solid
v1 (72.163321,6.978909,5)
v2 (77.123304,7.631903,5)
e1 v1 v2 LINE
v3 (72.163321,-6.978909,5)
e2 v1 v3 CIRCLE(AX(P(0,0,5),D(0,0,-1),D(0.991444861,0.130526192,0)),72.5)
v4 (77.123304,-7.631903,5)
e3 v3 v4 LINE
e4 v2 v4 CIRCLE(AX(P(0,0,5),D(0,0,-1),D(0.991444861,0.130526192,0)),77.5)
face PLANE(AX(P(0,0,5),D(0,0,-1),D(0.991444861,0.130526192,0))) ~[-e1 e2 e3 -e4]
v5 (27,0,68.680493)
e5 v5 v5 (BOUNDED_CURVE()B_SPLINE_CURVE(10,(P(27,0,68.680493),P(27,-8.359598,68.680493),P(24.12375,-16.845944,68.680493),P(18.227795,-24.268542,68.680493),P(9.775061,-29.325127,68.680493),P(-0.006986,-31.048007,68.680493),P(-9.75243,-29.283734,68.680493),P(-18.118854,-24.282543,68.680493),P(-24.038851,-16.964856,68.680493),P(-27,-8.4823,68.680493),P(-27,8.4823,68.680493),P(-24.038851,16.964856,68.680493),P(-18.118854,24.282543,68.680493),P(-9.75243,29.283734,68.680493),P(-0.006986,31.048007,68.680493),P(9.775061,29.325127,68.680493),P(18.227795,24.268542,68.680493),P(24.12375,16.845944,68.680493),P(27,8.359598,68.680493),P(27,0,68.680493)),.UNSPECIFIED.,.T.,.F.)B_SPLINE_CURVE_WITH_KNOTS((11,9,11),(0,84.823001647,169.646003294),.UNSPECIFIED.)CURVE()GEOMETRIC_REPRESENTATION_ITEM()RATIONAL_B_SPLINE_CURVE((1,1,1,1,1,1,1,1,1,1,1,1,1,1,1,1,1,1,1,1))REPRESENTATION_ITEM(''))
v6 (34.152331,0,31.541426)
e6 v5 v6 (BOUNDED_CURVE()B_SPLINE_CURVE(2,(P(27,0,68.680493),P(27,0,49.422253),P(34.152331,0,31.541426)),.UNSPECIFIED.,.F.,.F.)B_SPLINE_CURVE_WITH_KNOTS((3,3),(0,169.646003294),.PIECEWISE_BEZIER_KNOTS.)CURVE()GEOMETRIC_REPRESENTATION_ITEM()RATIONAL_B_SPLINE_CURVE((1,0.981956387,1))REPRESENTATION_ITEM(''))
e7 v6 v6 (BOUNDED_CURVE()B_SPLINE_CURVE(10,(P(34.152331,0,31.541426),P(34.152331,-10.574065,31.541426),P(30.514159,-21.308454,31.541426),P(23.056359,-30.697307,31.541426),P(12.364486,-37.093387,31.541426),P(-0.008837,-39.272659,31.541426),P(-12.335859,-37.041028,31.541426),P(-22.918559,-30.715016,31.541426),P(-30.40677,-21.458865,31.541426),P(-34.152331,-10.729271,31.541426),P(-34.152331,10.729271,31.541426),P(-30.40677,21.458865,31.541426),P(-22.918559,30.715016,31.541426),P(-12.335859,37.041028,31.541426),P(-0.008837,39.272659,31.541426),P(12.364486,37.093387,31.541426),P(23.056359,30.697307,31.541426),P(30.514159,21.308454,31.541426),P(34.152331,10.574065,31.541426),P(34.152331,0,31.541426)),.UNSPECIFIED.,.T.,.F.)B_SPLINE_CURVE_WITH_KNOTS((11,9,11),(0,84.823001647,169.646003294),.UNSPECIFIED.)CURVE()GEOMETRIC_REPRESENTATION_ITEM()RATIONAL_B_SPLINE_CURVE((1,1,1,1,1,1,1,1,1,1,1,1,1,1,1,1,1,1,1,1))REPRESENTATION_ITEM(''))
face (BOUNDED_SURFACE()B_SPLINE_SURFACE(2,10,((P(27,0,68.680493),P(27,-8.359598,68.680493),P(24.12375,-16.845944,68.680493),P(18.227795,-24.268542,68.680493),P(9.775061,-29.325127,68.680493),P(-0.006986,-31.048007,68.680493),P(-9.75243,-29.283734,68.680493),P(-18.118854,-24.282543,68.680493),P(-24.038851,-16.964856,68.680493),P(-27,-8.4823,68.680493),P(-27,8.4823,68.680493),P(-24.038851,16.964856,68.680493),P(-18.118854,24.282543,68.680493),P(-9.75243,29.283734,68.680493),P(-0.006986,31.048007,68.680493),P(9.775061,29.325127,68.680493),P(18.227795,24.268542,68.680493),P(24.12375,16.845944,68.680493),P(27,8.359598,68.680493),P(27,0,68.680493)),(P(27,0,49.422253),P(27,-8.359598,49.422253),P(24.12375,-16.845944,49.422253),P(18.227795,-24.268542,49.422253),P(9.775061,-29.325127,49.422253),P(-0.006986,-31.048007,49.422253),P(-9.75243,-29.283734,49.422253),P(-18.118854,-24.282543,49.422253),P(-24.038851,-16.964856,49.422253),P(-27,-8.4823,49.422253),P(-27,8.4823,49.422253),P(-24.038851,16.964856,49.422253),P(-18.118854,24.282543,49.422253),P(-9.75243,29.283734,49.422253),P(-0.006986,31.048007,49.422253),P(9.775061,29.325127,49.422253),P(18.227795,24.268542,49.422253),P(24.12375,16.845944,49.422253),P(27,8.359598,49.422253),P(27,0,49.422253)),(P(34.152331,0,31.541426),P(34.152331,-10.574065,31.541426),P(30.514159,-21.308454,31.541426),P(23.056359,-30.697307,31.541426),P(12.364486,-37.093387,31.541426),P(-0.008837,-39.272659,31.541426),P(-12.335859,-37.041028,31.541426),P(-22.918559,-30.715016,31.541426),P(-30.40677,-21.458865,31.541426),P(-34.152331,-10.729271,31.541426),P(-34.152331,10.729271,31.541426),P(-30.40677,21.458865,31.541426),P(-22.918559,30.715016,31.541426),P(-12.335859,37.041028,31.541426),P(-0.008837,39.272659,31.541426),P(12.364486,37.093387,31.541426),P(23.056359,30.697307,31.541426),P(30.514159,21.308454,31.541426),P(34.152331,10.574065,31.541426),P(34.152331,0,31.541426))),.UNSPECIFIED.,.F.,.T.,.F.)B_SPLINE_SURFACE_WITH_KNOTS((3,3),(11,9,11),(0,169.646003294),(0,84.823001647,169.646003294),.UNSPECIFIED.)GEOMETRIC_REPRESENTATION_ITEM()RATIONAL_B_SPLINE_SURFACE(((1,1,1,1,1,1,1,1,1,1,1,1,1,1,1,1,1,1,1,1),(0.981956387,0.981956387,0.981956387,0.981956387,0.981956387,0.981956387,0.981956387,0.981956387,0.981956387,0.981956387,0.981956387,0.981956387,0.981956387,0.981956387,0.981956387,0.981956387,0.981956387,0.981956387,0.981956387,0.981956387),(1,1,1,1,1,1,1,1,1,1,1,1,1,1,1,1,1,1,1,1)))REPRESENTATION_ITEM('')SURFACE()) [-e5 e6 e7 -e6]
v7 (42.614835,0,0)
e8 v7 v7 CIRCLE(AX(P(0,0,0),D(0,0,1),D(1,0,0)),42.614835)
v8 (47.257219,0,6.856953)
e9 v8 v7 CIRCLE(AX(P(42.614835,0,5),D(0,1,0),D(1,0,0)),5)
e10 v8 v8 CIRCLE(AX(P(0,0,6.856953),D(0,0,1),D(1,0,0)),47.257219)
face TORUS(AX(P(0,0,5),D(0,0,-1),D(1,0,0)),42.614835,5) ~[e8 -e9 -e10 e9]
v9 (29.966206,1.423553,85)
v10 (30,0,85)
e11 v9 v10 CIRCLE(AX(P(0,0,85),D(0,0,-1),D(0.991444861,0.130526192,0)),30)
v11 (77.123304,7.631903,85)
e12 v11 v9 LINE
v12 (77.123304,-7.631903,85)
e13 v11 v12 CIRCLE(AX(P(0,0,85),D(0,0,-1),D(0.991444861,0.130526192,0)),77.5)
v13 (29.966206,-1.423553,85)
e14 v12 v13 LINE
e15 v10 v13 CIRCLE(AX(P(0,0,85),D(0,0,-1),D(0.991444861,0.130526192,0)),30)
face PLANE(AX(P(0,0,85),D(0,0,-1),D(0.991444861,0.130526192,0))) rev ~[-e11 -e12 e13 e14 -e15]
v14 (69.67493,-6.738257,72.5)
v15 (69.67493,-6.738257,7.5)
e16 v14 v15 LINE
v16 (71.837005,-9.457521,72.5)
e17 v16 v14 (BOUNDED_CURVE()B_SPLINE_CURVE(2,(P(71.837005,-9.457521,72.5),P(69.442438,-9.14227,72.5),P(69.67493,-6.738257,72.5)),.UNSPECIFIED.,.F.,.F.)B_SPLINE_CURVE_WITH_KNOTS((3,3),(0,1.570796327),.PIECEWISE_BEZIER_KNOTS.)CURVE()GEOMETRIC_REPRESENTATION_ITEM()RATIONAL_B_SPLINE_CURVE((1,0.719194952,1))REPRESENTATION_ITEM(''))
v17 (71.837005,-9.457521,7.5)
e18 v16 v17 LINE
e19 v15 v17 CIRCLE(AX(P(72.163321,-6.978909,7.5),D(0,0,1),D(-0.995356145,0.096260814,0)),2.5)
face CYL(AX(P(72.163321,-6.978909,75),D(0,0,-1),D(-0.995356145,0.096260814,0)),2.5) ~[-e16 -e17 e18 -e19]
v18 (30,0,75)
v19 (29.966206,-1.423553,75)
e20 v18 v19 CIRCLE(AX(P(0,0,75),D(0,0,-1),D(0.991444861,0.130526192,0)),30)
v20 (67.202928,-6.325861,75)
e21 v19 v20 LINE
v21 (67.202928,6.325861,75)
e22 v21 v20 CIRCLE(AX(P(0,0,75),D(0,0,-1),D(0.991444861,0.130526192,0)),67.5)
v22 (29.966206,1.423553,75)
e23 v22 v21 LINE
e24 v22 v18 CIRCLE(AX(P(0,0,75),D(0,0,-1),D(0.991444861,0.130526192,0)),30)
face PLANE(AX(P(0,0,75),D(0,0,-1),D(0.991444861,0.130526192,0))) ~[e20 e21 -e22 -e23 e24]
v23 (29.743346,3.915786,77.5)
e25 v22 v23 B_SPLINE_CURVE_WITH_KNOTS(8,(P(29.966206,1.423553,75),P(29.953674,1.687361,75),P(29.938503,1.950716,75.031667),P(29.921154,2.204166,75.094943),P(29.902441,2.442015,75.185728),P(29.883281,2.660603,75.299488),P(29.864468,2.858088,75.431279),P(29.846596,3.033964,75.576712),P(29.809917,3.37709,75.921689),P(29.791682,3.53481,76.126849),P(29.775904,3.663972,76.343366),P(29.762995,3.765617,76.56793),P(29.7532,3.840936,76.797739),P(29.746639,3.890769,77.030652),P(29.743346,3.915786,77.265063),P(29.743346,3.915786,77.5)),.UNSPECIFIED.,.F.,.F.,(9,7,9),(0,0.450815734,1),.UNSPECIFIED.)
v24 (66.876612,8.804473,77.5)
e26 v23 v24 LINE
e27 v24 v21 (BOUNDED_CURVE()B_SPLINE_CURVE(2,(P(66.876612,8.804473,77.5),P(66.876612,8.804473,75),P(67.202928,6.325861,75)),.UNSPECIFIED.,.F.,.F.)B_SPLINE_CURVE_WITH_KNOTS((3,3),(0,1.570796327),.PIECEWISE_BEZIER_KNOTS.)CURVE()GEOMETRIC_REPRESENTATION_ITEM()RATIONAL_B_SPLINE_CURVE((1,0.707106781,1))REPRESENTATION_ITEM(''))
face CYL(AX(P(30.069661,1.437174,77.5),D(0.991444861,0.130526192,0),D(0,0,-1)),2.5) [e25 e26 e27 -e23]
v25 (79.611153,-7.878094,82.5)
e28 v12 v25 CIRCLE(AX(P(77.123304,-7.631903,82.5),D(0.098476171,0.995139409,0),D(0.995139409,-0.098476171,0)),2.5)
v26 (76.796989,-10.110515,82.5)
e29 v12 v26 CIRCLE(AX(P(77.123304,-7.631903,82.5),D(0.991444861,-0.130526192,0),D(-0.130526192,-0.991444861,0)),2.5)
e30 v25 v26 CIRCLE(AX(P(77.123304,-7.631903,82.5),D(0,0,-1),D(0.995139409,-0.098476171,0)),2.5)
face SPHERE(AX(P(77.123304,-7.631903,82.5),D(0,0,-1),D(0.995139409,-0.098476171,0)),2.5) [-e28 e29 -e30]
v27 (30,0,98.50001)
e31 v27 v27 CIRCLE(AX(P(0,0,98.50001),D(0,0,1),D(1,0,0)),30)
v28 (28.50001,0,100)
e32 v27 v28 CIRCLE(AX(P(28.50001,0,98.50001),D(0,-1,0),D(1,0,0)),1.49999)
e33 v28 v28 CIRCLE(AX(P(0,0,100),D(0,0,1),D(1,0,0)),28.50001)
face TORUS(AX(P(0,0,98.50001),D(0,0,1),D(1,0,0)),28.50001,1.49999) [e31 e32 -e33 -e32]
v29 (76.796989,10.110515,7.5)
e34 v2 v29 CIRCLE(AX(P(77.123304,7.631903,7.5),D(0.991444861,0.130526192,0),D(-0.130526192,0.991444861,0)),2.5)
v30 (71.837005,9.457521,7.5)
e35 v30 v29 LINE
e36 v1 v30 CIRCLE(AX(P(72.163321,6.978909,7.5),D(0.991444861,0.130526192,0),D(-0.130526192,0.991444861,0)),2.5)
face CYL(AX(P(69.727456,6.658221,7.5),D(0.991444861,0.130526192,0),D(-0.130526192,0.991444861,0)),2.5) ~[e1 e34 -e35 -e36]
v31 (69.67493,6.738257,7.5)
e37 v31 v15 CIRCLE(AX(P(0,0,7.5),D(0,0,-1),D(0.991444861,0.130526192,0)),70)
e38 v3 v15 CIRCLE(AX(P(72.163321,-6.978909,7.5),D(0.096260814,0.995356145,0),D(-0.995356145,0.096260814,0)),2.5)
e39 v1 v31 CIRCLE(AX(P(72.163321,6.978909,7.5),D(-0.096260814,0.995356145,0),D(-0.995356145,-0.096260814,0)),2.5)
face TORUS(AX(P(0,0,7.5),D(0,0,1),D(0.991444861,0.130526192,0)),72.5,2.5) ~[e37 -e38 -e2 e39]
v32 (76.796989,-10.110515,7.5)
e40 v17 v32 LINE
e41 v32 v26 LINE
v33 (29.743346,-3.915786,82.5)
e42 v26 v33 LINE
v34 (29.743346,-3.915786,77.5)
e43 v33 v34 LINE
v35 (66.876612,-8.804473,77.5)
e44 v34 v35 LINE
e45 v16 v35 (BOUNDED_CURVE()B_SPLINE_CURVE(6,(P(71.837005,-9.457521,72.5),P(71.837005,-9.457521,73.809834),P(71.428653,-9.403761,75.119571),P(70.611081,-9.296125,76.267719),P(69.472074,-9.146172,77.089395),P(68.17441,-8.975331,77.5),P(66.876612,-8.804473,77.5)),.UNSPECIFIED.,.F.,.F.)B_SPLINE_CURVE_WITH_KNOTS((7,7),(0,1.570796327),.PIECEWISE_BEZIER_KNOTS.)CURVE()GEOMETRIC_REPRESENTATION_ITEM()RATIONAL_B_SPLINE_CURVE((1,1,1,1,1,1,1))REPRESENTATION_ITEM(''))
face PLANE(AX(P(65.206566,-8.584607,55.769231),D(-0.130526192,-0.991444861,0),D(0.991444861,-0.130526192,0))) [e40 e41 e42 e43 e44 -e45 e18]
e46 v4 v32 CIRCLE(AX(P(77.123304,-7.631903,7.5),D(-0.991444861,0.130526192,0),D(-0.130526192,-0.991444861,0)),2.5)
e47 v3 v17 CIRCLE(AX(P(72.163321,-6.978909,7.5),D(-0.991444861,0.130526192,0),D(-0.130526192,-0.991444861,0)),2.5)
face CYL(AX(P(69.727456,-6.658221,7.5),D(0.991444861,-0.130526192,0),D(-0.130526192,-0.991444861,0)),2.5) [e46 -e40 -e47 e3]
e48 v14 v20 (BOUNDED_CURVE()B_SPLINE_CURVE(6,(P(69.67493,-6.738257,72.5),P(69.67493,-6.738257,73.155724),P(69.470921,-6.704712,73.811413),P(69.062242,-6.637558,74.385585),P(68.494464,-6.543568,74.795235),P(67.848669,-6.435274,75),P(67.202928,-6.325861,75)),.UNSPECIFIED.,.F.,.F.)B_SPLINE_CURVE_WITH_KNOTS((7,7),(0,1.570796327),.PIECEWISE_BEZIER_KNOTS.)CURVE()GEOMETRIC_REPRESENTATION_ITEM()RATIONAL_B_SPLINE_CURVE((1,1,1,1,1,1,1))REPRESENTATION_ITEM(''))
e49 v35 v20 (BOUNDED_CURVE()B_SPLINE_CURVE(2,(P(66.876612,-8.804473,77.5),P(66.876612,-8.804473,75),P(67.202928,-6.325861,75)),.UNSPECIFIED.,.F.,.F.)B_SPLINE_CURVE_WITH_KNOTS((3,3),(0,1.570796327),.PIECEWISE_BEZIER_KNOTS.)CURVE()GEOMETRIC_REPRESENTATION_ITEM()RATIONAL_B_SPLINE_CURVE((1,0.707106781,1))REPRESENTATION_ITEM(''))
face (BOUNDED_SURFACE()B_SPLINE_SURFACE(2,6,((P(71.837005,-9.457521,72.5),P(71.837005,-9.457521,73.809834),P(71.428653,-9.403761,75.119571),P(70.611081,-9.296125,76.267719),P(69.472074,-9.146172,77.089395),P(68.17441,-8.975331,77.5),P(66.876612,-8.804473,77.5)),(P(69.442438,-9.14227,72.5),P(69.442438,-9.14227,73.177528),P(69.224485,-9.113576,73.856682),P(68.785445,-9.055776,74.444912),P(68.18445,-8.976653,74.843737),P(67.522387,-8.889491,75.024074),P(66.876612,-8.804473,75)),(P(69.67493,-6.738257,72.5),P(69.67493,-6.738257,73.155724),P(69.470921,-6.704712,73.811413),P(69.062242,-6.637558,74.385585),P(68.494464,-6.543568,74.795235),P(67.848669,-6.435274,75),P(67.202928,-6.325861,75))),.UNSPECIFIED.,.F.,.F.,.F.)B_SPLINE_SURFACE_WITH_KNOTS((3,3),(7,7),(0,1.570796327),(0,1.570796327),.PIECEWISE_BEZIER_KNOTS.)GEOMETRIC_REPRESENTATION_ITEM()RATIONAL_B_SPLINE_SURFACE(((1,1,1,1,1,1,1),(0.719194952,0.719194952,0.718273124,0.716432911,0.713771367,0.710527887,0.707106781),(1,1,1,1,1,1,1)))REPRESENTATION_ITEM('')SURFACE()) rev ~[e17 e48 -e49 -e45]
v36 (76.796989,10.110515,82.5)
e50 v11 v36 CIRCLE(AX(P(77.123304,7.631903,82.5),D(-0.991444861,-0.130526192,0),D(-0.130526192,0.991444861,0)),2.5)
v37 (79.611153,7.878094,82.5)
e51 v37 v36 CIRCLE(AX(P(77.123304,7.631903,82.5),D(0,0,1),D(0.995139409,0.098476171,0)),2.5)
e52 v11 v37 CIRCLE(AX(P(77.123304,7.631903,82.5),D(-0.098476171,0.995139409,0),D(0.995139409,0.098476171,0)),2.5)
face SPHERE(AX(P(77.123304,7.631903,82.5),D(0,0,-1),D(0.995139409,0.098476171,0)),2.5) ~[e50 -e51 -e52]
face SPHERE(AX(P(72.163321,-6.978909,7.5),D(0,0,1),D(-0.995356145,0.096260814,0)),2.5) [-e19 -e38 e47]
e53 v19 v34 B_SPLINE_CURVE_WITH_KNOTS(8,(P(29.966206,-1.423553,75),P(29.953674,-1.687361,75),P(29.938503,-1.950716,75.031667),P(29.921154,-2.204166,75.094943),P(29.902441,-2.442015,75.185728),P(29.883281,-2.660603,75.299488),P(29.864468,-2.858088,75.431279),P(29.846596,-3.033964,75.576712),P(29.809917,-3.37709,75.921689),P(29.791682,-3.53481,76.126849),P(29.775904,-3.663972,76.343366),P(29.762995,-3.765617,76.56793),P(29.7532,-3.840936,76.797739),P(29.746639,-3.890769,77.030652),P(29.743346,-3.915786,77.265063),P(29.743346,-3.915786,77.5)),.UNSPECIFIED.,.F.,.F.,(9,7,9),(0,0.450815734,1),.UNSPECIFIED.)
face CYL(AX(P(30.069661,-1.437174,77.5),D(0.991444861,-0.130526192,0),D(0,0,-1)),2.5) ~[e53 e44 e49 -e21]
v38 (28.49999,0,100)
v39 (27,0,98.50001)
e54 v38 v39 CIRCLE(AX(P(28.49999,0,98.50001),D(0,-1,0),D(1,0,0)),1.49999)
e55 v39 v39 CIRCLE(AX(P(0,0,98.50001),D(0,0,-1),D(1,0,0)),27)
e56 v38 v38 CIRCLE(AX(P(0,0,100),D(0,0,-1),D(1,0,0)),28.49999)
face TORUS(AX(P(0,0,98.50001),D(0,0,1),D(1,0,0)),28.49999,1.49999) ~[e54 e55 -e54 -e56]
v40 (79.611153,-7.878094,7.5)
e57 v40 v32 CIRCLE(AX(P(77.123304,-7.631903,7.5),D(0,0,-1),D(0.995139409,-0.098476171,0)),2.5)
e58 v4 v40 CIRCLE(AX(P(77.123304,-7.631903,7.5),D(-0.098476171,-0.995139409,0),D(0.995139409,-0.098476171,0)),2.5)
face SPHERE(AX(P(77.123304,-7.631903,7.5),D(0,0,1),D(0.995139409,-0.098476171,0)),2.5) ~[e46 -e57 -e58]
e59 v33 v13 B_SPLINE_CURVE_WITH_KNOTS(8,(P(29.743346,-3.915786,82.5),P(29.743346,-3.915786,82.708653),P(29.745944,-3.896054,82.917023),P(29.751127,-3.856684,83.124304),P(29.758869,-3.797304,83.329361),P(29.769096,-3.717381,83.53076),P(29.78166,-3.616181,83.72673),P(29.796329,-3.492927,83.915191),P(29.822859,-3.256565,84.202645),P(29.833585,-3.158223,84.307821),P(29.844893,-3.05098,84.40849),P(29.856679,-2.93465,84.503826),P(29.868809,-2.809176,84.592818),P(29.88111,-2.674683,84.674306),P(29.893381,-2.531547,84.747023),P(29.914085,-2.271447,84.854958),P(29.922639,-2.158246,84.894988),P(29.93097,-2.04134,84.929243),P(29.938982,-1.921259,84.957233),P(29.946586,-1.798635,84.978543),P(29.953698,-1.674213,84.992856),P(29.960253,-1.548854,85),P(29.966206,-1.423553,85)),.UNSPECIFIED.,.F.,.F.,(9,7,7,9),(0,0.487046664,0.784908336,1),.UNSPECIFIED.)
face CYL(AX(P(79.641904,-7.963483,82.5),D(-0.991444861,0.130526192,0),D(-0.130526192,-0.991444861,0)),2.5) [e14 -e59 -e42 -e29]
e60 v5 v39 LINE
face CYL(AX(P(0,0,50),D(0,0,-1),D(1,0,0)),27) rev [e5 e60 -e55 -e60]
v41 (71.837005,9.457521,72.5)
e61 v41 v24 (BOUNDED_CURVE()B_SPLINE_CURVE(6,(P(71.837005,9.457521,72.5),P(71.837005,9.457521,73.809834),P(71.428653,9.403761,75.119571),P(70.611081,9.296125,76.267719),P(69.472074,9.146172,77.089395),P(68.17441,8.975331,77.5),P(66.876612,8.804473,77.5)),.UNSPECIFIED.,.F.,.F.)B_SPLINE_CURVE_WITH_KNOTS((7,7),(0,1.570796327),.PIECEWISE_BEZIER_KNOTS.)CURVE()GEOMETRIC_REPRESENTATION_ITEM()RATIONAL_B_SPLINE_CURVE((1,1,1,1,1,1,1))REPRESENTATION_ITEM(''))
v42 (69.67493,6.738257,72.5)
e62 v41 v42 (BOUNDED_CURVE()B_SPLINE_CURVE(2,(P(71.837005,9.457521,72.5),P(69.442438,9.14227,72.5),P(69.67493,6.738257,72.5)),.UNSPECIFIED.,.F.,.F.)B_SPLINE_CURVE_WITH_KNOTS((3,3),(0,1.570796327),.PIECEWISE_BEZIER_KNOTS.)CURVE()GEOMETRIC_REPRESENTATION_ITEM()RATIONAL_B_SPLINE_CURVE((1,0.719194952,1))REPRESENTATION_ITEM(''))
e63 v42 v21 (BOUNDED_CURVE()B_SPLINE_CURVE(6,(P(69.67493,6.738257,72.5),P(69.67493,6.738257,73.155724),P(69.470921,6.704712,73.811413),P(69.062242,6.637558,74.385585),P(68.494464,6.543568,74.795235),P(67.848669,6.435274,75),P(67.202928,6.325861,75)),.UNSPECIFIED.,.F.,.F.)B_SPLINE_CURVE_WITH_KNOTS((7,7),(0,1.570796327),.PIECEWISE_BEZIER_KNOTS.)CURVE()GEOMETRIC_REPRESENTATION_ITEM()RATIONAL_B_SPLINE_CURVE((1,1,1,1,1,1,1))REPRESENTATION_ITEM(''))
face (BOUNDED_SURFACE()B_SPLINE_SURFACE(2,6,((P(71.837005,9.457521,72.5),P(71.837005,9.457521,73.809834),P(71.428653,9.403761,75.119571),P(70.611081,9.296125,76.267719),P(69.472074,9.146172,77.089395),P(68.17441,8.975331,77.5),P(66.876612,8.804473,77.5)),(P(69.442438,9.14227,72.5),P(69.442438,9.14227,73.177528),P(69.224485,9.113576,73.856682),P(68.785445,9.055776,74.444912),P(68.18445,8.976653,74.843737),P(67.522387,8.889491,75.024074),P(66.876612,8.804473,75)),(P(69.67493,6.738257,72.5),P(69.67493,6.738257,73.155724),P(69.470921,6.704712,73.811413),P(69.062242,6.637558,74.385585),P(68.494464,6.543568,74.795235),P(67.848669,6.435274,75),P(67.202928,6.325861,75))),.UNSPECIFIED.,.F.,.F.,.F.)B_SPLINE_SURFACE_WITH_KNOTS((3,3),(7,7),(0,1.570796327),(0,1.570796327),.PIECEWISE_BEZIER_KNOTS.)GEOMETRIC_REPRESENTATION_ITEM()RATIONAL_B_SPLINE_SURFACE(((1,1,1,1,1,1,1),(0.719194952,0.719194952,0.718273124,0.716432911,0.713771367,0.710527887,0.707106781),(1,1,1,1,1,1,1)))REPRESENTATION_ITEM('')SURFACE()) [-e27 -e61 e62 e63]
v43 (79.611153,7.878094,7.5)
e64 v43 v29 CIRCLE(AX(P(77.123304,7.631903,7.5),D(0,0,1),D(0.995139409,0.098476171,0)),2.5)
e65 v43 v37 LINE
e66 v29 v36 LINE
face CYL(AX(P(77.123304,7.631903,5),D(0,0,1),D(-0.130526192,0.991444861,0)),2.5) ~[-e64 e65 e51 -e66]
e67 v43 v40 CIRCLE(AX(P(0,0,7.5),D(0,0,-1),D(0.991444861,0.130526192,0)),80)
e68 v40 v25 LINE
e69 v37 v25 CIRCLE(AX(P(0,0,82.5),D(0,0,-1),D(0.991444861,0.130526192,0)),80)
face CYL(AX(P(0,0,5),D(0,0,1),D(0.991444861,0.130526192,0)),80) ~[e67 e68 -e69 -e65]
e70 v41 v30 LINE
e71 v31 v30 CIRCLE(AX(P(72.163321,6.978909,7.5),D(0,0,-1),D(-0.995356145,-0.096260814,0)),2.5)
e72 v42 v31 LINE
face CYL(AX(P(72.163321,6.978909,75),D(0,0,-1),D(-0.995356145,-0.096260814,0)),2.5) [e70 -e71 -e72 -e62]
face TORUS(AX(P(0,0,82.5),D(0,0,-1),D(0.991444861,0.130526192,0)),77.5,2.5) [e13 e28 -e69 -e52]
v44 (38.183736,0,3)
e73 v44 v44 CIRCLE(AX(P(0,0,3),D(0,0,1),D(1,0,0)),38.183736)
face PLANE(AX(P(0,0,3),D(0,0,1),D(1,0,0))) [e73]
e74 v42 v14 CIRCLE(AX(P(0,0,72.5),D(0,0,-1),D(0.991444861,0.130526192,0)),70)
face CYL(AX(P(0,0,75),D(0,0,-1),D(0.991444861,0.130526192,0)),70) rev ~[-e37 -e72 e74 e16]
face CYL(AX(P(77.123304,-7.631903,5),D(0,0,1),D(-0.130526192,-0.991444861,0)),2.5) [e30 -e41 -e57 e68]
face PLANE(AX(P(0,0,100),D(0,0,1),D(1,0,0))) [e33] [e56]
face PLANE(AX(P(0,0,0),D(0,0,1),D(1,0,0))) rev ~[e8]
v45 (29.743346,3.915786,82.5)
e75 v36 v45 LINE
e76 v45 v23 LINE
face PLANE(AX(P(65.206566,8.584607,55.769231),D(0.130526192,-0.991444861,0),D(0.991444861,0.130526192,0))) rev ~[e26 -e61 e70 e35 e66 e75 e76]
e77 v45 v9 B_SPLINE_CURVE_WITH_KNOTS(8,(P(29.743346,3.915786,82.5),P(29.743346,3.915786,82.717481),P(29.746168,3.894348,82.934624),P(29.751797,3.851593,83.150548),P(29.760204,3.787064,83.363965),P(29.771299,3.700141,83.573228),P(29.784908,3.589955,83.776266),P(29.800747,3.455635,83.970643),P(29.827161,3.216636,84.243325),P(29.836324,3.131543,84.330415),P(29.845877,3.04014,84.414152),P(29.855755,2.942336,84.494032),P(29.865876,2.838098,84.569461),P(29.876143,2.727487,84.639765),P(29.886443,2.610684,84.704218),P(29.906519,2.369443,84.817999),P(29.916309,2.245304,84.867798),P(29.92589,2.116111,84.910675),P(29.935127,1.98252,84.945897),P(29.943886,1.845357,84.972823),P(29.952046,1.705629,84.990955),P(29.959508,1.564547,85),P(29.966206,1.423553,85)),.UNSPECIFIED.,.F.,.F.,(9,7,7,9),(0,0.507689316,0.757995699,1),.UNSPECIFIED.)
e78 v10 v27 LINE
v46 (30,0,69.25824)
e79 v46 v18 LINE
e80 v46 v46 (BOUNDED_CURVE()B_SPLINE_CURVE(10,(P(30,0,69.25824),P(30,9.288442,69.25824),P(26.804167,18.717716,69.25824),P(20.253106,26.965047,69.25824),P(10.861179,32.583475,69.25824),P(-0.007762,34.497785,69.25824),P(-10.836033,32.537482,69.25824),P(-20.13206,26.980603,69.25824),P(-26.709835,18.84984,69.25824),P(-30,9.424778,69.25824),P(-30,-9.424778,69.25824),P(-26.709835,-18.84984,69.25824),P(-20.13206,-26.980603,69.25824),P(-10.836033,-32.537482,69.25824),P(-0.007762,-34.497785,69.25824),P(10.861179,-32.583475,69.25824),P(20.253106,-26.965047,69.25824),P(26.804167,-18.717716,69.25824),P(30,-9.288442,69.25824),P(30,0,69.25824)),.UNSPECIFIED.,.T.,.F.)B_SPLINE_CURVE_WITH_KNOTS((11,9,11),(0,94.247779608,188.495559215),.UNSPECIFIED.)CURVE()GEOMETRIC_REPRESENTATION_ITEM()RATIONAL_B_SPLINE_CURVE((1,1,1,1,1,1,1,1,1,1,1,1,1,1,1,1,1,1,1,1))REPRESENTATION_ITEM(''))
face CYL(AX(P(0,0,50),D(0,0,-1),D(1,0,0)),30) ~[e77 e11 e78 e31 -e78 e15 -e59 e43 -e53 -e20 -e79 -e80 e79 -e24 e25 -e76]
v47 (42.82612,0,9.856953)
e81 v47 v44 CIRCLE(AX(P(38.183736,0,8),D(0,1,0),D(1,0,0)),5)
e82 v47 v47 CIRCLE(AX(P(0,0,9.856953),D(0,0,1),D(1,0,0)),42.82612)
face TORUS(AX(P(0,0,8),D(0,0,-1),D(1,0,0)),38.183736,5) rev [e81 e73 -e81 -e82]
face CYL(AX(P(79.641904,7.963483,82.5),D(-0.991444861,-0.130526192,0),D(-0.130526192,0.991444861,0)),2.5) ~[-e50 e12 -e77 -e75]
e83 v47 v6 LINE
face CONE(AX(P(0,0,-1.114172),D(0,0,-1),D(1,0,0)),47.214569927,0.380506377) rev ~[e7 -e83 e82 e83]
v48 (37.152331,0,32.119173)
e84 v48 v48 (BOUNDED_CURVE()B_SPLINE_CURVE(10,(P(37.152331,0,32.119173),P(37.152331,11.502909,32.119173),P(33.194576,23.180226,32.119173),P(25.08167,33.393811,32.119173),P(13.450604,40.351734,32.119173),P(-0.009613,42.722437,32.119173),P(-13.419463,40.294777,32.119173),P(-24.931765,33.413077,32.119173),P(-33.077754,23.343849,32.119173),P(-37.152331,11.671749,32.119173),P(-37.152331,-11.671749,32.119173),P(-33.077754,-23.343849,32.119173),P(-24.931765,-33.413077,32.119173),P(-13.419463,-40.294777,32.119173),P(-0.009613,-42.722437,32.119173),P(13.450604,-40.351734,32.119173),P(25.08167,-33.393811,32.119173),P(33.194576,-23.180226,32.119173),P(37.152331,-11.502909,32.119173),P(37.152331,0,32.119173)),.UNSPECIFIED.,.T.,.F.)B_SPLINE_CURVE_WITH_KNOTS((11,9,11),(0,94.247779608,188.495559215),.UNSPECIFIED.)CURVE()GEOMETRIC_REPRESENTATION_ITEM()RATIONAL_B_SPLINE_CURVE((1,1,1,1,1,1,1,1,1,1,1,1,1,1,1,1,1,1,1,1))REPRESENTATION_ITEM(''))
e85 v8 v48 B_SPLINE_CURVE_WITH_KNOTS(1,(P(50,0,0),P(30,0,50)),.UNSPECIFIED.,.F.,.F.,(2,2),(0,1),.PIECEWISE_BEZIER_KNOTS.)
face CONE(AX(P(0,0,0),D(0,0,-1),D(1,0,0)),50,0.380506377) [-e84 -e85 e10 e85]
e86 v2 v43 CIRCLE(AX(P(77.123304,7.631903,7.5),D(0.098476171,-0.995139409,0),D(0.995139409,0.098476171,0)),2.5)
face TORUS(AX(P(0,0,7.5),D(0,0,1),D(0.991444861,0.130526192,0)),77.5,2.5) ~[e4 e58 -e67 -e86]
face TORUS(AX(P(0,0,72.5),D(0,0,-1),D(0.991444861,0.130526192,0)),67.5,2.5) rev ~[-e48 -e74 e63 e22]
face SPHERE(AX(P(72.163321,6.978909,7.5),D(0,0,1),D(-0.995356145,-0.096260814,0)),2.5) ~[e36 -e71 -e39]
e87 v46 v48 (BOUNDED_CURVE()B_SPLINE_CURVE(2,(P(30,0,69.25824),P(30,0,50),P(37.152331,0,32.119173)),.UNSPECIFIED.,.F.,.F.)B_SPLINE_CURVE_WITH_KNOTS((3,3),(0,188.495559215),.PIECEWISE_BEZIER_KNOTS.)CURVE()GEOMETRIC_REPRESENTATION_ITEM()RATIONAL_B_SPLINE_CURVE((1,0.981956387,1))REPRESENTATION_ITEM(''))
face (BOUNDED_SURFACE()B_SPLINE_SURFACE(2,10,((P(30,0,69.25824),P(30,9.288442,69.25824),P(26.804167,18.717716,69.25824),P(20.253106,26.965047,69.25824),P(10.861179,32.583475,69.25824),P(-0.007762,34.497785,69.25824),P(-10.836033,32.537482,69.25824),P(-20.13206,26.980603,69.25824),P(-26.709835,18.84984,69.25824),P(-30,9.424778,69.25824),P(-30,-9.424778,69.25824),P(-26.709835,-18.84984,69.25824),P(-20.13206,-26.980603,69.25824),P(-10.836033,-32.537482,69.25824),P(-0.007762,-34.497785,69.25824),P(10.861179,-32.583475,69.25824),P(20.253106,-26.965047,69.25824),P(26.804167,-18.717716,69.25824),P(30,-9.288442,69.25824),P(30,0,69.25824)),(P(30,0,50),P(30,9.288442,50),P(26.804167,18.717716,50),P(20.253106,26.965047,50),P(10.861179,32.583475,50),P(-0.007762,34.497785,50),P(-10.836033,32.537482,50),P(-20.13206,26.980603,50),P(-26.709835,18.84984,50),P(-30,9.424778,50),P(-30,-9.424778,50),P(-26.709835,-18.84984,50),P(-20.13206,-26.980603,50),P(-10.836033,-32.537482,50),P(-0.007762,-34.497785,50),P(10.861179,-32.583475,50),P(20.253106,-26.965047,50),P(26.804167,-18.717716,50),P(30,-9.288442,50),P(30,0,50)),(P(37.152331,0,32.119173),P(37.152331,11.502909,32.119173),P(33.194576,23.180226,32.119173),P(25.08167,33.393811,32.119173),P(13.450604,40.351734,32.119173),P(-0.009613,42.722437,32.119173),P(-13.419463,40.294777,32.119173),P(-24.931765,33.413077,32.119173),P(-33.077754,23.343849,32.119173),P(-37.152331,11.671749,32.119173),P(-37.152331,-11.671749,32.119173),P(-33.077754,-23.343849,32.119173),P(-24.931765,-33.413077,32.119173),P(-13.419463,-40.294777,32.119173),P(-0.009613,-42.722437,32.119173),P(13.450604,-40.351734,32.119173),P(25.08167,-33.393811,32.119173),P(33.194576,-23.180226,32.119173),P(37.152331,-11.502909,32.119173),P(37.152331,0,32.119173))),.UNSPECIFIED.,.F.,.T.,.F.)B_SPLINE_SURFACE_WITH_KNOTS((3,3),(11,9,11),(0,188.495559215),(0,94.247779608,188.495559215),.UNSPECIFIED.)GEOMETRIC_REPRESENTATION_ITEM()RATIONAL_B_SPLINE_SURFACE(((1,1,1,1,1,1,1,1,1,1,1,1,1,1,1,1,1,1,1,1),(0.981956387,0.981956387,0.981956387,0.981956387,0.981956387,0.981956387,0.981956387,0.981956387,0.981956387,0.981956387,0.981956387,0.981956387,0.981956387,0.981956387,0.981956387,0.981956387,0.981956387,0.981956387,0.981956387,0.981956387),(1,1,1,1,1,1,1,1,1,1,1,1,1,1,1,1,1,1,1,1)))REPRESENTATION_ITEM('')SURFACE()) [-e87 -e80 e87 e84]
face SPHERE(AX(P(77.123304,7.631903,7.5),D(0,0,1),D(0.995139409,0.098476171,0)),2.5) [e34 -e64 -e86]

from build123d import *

# Parameters (mm, degrees)
F0_R          = 50
F2_R          = 30
F4_DEPTH      = 50
F5_T          = -3
F6_R          = 1.49999
F7_R          = 5
F9_ANGLE_BACK = 7.5
F9_ANGLE      = 15
F10_R         = 2.5
F11_R         = 100


# Not quite as in the source:
# - a fillet or chamfer is up to 0.001 mm smaller than in the source, because OpenCascade refuses the exact size


with BuildPart() as f3:
    # F0 (on Top) → F3 section 0
    with BuildSketch(Plane.XY):
        Circle(F0_R)
    # F2 (on offset) → F3 section 1
    with BuildSketch(Plane.XY.offset(50)):
        Circle(F2_R)
    loft()

    # F4 (add): a face of the model
    f4_faces = [f3.faces().sort_by_distance(p)[0] for p in [
        (0, 0, 50),
    ]]
    extrude(f4_faces, amount=F4_DEPTH)

    # F5
    f5_openings = [f3.faces().sort_by_distance(p)[0] for p in [
        (0, 0, 100),
    ]]
    offset(amount=F5_T, openings=f5_openings, kind=Kind.INTERSECTION)

    # F6 (radius 1.5 in the source; OpenCascade refuses exactly that, so slightly less here)
    f6_edges = [f3.edges().sort_by_distance(p)[0] for p in [
        (-30, 0, 100),
        (-27, 0, 100),
    ]]
    fillet(f6_edges, radius=F6_R)

    # F7
    f7_edges = [f3.edges().sort_by_distance(p)[0] for p in [
        (-50, 0, 0),
        (-45.568901, 0, 3),
    ]]
    fillet(f7_edges, radius=F7_R)

    # F8 (on Front) → F9 (revolve)
    with BuildSketch(Plane.XZ, mode=Mode.PRIVATE) as f9_sk:
        Polygon((30, 85), (30, 80), (30, 75), (70, 75), (70, 5), (80, 5), (80, 85), align=None)
    revolve(f9_sk.sketch.rotate(Axis((0, 0, 40), (0, 0, -1)), -F9_ANGLE_BACK), axis=Axis((0, 0, 40), (0, 0, -1)), revolution_arc=F9_ANGLE)

    # F10
    f10_edges = [f3.edges().sort_by_distance(p)[0] for p in [
        (54.529467, -7.178941, 85),
        (54.529467, 7.178941, 85),
        (79.315589, 10.442095, 45),
        (79.315589, -10.442095, 45),
        (80, 0, 85),
        (80, 0, 5),
        (74.358365, 9.789464, 5),
        (74.358365, -9.789464, 5),
        (69.40114, 9.136833, 40),
        (69.40114, -9.136833, 40),
        (49.572243, 6.52631, 75),
        (49.572243, -6.52631, 75),
        (70, 0, 5),
        (70, 0, 75),
    ]]
    fillet(f10_edges, radius=F10_R)

    # F11
    f11_edges = [f3.edges().sort_by_distance(p)[0] for p in [
        (-30, 0, 50),
        (-27, 0, 49.422253),
    ]]
    fillet(f11_edges, radius=F11_R)


solid = f3.part
